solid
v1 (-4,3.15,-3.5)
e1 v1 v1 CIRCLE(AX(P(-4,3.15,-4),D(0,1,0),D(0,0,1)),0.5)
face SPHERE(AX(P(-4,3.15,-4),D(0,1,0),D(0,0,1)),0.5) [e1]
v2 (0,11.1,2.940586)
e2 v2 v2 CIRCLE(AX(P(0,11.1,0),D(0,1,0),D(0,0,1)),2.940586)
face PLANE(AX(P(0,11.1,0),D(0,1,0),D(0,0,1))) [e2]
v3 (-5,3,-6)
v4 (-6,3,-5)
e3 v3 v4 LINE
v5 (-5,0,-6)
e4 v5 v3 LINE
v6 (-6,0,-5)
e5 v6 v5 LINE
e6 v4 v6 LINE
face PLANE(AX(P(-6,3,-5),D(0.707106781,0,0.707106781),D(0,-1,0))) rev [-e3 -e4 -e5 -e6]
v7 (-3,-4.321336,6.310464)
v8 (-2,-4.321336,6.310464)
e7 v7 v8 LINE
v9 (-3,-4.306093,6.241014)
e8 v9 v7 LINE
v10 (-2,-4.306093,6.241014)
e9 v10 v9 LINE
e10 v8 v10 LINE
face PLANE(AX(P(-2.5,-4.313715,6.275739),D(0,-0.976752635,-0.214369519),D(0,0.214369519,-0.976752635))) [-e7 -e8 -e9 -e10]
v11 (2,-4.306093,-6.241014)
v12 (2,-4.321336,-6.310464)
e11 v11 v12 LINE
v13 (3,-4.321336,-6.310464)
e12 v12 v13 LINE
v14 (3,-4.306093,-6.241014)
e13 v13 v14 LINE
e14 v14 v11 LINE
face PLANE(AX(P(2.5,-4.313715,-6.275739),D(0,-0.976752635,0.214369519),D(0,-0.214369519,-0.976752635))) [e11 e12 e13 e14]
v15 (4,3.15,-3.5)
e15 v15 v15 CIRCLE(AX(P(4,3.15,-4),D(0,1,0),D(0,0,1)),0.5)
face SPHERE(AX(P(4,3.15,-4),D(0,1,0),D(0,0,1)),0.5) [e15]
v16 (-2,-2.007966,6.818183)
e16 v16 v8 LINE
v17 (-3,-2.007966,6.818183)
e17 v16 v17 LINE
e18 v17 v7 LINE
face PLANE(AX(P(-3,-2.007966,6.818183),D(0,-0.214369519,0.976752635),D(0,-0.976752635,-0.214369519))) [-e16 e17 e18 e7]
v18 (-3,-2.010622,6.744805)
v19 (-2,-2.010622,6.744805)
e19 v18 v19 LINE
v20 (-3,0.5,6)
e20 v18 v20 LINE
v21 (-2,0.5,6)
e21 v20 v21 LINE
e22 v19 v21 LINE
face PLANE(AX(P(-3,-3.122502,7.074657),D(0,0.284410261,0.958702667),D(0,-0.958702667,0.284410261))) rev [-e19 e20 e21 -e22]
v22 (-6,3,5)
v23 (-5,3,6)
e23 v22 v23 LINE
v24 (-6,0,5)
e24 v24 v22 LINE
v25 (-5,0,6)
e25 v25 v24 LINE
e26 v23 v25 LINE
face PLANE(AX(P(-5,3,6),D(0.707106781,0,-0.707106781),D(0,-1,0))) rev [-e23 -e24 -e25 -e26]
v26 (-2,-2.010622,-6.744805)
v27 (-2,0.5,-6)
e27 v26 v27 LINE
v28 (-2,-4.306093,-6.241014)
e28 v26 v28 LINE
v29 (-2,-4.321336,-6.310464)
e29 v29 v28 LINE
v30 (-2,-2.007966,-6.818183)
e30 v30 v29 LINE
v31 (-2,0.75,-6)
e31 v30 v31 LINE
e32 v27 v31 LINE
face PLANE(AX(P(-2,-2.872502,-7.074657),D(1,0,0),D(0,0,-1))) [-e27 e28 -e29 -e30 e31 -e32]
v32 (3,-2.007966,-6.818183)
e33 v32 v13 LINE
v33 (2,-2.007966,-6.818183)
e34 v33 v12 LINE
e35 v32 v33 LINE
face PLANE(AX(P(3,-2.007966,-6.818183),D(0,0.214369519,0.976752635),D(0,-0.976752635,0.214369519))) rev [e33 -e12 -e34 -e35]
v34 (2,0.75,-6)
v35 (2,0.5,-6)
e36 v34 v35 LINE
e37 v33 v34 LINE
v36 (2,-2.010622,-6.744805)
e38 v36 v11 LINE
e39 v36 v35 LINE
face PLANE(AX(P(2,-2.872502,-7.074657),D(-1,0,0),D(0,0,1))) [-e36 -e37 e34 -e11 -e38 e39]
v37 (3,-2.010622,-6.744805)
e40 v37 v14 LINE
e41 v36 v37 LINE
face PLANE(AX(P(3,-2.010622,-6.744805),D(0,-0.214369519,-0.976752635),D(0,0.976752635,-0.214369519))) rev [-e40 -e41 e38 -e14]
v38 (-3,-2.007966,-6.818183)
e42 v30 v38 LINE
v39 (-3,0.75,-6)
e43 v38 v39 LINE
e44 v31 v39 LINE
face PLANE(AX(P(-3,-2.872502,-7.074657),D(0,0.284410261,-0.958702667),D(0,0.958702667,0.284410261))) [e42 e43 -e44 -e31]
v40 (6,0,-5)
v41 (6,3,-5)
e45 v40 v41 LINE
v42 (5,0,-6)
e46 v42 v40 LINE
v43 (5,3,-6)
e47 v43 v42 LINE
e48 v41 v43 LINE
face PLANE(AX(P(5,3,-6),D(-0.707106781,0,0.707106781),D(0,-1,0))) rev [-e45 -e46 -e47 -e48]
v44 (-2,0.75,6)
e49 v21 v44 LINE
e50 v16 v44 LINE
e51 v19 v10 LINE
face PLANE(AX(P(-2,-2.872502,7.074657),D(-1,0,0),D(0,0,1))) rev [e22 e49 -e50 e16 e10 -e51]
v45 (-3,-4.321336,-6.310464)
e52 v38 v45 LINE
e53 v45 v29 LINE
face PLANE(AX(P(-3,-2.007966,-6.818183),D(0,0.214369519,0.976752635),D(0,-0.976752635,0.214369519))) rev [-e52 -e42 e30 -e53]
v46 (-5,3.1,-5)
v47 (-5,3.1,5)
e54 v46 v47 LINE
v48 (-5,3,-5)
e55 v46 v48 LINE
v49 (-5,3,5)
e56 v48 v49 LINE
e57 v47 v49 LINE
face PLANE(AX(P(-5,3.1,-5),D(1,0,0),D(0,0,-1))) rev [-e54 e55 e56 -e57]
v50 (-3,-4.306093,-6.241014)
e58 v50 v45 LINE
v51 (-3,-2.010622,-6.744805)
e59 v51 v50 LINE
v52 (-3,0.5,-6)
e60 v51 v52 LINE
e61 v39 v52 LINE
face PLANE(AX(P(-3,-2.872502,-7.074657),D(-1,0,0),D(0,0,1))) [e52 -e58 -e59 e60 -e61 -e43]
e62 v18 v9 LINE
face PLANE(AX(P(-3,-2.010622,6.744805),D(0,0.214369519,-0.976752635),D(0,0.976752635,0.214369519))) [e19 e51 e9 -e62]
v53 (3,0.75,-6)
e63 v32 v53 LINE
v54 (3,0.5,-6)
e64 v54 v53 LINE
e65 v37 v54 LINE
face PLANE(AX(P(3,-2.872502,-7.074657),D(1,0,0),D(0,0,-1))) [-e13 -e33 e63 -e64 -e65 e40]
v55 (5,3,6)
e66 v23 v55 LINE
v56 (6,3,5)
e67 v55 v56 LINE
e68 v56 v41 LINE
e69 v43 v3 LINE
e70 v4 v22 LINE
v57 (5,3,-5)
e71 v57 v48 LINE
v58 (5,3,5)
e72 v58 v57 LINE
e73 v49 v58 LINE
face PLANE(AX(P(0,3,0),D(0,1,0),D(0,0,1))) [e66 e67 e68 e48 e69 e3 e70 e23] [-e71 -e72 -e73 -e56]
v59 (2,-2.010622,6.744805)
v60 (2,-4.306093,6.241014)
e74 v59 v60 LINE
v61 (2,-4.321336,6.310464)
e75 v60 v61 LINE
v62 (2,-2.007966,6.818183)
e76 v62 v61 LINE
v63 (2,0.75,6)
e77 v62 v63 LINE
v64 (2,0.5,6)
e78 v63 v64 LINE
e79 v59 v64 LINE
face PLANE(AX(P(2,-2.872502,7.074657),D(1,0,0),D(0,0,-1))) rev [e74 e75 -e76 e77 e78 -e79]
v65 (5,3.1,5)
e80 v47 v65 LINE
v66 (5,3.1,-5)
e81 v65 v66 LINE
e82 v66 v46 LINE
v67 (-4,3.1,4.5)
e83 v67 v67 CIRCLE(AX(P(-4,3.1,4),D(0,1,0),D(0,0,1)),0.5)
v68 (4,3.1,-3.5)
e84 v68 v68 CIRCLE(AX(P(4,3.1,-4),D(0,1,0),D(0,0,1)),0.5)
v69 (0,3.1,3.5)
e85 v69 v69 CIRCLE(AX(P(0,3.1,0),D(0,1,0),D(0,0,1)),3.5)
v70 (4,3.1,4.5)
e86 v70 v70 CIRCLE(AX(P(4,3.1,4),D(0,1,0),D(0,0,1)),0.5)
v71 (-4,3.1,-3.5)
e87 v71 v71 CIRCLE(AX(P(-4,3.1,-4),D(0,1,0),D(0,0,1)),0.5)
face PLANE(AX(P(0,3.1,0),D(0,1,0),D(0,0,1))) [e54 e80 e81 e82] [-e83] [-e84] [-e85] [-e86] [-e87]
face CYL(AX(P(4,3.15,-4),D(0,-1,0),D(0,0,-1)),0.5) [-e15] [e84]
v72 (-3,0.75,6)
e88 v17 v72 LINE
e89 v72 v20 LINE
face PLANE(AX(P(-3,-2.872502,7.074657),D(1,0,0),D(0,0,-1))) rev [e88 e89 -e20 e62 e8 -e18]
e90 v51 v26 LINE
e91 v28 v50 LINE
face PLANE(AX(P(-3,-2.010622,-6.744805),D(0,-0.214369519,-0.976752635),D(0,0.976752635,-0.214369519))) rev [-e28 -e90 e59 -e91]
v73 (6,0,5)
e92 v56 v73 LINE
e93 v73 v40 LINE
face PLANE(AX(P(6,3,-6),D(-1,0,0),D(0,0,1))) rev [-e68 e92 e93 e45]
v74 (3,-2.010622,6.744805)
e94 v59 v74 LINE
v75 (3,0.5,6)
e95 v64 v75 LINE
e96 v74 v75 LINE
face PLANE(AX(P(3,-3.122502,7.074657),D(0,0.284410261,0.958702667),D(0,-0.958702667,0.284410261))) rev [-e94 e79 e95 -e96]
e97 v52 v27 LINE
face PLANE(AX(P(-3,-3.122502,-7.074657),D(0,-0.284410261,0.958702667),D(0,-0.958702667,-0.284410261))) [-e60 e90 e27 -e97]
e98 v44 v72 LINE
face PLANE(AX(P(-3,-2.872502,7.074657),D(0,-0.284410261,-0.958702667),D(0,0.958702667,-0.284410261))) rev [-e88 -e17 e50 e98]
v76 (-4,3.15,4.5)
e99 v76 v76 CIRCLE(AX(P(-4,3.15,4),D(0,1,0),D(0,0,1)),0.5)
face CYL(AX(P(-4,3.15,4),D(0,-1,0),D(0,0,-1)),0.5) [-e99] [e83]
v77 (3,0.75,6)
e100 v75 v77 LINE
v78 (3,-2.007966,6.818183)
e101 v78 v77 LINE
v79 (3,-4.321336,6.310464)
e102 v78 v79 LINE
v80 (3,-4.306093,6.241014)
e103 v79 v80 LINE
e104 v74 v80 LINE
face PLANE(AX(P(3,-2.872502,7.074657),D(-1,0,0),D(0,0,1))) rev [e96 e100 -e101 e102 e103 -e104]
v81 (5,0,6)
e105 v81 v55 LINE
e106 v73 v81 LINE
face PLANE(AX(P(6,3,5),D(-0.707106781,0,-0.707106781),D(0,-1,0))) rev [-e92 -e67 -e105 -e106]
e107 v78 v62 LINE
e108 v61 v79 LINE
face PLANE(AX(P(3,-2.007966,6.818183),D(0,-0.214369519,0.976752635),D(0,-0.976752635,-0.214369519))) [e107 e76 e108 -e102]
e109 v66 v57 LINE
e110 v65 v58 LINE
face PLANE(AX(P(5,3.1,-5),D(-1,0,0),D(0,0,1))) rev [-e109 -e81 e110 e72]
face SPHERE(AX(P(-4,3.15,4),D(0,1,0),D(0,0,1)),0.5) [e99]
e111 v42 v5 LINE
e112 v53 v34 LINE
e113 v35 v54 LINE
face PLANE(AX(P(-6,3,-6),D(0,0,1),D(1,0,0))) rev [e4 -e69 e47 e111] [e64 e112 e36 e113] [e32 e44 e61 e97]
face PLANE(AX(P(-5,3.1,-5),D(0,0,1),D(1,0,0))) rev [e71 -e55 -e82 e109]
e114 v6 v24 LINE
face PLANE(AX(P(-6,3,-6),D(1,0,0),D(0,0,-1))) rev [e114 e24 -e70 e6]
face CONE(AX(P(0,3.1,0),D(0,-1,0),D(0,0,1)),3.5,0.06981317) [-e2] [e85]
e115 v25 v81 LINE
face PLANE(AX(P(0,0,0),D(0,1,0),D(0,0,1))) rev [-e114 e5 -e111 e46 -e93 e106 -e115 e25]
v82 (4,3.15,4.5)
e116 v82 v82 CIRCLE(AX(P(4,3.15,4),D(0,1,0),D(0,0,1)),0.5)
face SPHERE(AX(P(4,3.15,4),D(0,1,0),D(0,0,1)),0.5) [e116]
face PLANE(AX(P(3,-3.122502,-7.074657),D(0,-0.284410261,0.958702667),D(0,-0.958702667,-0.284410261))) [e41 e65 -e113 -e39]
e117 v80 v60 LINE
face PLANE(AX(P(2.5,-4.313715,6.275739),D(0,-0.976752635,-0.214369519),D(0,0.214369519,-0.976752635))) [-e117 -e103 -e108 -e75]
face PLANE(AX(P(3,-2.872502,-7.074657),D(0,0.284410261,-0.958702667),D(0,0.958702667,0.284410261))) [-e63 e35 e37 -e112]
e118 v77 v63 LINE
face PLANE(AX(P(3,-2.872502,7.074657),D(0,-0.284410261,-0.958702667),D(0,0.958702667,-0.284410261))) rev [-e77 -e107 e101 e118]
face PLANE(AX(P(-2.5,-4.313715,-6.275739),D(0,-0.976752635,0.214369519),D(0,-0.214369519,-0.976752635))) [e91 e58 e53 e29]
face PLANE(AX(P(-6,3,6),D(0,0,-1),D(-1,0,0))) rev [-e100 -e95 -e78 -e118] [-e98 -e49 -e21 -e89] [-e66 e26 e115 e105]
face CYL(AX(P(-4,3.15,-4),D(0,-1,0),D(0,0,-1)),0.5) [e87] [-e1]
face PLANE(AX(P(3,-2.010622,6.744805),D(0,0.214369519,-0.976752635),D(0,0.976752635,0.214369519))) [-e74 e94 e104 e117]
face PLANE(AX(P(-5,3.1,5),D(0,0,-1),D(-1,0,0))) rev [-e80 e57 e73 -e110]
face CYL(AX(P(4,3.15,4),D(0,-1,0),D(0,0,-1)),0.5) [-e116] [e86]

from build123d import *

# Parameters (mm, degrees)
SKETCH1_W            = 12
SKETCH1_H            = 12
BOSS_EXTRUDE1_DEPTH  = 3
CHAMFER1_SIZE        = 1
SKETCH2_W            = 10
SKETCH2_H            = 10
BOSS_EXTRUDE2_DEPTH  = 0.1
SKETCH3_R            = 0.5
BOSS_EXTRUDE3_DEPTH  = 0.05
LPATTERN1_COUNT      = 2
LPATTERN1_PITCH      = 8
LPATTERN1_COUNT_DIR2 = 2
LPATTERN1_PITCH_DIR2 = 8
SKETCH4_R            = 3.5
BOSS_EXTRUDE4_DEPTH  = 8
BOSS_EXTRUDE4_TAPER  = 4
SWEEP1_START         = -3
SWEEP1_DEPTH         = 1
SWEEP1_START_2       = 2
SWEEP1_2_DEPTH       = 1


# Read off the part's stored shape, not the designer's step: Dome1, Sweep1
with BuildPart() as part:
    # Sketch1 → Boss-Extrude1 (new body)
    with BuildSketch(Plane(origin=(0, 0, 0), x_dir=(1, 0, 0), z_dir=(0, 1, 0))):
        Rectangle(SKETCH1_W, SKETCH1_H)
    extrude(amount=BOSS_EXTRUDE1_DEPTH)

    # Chamfer1
    chamfer1_edges = [part.edges().sort_by_distance(p)[0] for p in [
        (6, 1.5, 6),
        (-6, 1.5, 6),
        (-6, 1.5, -6),
        (6, 1.5, -6),
    ]]
    chamfer(chamfer1_edges, length=CHAMFER1_SIZE)

    # Sketch2 → Boss-Extrude2 (add)
    with BuildSketch(Plane(origin=(0, 3, 0), x_dir=(1, 0, 0), z_dir=(0, 1, 0))):
        Rectangle(SKETCH2_W, SKETCH2_H)
    extrude(amount=BOSS_EXTRUDE2_DEPTH)

    # Sketch3 → Boss-Extrude3 (add)
    with BuildSketch(Plane(origin=(0, 3.1, 0), x_dir=(1, 0, 0), z_dir=(0, 1, 0))):
        with Locations(Location((-4, 4, 0), (0, 0, 270))):
            Circle(SKETCH3_R)
    boss_extrude3 = extrude(amount=BOSS_EXTRUDE3_DEPTH)

    # Dome1 outline → Dome1 (revolve)
    with BuildSketch(Plane(origin=(-4, 0, -4), x_dir=(1, 0, 0), z_dir=(0, 0, 1))):
        with BuildLine():
            Line((0, 3.15), (0.5, 3.149999999))
            ThreePointArc((0.5, 3.149999999), (0.353553391, 3.50355339), (0, 3.65))
            Line((0, 3.65), (0, 3.15))
        make_face()
    dome1 = revolve(axis=Axis((-4, 0, -4), (0, 1, 0)))

    # LPattern1: Boss-Extrude3, Dome1 2 × 2
    with Locations(*[(i * LPATTERN1_PITCH, 0, j * LPATTERN1_PITCH_DIR2) for i in range(LPATTERN1_COUNT) for j in range(LPATTERN1_COUNT_DIR2) if (i, j) != (0, 0)]):
        add(boss_extrude3)
        add(dome1)

    # Sketch4 → Boss-Extrude4 (add)
    with BuildSketch(Plane(origin=(0, 3.1, 0), x_dir=(1, 0, 0), z_dir=(0, 1, 0))):
        Circle(SKETCH4_R)
    extrude(amount=BOSS_EXTRUDE4_DEPTH, taper=BOSS_EXTRUDE4_TAPER)

    # Sweep1 outline → Sweep1 (add)
    with BuildSketch(Plane.YZ.offset(SWEEP1_START)):
        Polygon((0.75, 6), (-2.007966225, 6.818182656), (-4.321335721, 6.310463619), (-4.306093498, 6.241014001), (-2.010621634, 6.744805015), (0.5, 6), align=None)
    sweep1 = extrude(amount=SWEEP1_DEPTH)

    # Sweep1 2 outline → Sweep1 2 (add)
    with BuildSketch(Plane.YZ.offset(SWEEP1_START_2)):
        Polygon((0.75, 6), (-2.007966225, 6.818182656), (-4.321335721, 6.310463619), (-4.306093498, 6.241014001), (-2.010621634, 6.744805015), (0.5, 6), align=None)
    sweep1_2 = extrude(amount=SWEEP1_2_DEPTH)

    # Mirror1: Sweep1, Sweep1 2 across plane
    add(sweep1.mirror(Plane.XY))
    add(sweep1_2.mirror(Plane.XY))


solid = part.part
